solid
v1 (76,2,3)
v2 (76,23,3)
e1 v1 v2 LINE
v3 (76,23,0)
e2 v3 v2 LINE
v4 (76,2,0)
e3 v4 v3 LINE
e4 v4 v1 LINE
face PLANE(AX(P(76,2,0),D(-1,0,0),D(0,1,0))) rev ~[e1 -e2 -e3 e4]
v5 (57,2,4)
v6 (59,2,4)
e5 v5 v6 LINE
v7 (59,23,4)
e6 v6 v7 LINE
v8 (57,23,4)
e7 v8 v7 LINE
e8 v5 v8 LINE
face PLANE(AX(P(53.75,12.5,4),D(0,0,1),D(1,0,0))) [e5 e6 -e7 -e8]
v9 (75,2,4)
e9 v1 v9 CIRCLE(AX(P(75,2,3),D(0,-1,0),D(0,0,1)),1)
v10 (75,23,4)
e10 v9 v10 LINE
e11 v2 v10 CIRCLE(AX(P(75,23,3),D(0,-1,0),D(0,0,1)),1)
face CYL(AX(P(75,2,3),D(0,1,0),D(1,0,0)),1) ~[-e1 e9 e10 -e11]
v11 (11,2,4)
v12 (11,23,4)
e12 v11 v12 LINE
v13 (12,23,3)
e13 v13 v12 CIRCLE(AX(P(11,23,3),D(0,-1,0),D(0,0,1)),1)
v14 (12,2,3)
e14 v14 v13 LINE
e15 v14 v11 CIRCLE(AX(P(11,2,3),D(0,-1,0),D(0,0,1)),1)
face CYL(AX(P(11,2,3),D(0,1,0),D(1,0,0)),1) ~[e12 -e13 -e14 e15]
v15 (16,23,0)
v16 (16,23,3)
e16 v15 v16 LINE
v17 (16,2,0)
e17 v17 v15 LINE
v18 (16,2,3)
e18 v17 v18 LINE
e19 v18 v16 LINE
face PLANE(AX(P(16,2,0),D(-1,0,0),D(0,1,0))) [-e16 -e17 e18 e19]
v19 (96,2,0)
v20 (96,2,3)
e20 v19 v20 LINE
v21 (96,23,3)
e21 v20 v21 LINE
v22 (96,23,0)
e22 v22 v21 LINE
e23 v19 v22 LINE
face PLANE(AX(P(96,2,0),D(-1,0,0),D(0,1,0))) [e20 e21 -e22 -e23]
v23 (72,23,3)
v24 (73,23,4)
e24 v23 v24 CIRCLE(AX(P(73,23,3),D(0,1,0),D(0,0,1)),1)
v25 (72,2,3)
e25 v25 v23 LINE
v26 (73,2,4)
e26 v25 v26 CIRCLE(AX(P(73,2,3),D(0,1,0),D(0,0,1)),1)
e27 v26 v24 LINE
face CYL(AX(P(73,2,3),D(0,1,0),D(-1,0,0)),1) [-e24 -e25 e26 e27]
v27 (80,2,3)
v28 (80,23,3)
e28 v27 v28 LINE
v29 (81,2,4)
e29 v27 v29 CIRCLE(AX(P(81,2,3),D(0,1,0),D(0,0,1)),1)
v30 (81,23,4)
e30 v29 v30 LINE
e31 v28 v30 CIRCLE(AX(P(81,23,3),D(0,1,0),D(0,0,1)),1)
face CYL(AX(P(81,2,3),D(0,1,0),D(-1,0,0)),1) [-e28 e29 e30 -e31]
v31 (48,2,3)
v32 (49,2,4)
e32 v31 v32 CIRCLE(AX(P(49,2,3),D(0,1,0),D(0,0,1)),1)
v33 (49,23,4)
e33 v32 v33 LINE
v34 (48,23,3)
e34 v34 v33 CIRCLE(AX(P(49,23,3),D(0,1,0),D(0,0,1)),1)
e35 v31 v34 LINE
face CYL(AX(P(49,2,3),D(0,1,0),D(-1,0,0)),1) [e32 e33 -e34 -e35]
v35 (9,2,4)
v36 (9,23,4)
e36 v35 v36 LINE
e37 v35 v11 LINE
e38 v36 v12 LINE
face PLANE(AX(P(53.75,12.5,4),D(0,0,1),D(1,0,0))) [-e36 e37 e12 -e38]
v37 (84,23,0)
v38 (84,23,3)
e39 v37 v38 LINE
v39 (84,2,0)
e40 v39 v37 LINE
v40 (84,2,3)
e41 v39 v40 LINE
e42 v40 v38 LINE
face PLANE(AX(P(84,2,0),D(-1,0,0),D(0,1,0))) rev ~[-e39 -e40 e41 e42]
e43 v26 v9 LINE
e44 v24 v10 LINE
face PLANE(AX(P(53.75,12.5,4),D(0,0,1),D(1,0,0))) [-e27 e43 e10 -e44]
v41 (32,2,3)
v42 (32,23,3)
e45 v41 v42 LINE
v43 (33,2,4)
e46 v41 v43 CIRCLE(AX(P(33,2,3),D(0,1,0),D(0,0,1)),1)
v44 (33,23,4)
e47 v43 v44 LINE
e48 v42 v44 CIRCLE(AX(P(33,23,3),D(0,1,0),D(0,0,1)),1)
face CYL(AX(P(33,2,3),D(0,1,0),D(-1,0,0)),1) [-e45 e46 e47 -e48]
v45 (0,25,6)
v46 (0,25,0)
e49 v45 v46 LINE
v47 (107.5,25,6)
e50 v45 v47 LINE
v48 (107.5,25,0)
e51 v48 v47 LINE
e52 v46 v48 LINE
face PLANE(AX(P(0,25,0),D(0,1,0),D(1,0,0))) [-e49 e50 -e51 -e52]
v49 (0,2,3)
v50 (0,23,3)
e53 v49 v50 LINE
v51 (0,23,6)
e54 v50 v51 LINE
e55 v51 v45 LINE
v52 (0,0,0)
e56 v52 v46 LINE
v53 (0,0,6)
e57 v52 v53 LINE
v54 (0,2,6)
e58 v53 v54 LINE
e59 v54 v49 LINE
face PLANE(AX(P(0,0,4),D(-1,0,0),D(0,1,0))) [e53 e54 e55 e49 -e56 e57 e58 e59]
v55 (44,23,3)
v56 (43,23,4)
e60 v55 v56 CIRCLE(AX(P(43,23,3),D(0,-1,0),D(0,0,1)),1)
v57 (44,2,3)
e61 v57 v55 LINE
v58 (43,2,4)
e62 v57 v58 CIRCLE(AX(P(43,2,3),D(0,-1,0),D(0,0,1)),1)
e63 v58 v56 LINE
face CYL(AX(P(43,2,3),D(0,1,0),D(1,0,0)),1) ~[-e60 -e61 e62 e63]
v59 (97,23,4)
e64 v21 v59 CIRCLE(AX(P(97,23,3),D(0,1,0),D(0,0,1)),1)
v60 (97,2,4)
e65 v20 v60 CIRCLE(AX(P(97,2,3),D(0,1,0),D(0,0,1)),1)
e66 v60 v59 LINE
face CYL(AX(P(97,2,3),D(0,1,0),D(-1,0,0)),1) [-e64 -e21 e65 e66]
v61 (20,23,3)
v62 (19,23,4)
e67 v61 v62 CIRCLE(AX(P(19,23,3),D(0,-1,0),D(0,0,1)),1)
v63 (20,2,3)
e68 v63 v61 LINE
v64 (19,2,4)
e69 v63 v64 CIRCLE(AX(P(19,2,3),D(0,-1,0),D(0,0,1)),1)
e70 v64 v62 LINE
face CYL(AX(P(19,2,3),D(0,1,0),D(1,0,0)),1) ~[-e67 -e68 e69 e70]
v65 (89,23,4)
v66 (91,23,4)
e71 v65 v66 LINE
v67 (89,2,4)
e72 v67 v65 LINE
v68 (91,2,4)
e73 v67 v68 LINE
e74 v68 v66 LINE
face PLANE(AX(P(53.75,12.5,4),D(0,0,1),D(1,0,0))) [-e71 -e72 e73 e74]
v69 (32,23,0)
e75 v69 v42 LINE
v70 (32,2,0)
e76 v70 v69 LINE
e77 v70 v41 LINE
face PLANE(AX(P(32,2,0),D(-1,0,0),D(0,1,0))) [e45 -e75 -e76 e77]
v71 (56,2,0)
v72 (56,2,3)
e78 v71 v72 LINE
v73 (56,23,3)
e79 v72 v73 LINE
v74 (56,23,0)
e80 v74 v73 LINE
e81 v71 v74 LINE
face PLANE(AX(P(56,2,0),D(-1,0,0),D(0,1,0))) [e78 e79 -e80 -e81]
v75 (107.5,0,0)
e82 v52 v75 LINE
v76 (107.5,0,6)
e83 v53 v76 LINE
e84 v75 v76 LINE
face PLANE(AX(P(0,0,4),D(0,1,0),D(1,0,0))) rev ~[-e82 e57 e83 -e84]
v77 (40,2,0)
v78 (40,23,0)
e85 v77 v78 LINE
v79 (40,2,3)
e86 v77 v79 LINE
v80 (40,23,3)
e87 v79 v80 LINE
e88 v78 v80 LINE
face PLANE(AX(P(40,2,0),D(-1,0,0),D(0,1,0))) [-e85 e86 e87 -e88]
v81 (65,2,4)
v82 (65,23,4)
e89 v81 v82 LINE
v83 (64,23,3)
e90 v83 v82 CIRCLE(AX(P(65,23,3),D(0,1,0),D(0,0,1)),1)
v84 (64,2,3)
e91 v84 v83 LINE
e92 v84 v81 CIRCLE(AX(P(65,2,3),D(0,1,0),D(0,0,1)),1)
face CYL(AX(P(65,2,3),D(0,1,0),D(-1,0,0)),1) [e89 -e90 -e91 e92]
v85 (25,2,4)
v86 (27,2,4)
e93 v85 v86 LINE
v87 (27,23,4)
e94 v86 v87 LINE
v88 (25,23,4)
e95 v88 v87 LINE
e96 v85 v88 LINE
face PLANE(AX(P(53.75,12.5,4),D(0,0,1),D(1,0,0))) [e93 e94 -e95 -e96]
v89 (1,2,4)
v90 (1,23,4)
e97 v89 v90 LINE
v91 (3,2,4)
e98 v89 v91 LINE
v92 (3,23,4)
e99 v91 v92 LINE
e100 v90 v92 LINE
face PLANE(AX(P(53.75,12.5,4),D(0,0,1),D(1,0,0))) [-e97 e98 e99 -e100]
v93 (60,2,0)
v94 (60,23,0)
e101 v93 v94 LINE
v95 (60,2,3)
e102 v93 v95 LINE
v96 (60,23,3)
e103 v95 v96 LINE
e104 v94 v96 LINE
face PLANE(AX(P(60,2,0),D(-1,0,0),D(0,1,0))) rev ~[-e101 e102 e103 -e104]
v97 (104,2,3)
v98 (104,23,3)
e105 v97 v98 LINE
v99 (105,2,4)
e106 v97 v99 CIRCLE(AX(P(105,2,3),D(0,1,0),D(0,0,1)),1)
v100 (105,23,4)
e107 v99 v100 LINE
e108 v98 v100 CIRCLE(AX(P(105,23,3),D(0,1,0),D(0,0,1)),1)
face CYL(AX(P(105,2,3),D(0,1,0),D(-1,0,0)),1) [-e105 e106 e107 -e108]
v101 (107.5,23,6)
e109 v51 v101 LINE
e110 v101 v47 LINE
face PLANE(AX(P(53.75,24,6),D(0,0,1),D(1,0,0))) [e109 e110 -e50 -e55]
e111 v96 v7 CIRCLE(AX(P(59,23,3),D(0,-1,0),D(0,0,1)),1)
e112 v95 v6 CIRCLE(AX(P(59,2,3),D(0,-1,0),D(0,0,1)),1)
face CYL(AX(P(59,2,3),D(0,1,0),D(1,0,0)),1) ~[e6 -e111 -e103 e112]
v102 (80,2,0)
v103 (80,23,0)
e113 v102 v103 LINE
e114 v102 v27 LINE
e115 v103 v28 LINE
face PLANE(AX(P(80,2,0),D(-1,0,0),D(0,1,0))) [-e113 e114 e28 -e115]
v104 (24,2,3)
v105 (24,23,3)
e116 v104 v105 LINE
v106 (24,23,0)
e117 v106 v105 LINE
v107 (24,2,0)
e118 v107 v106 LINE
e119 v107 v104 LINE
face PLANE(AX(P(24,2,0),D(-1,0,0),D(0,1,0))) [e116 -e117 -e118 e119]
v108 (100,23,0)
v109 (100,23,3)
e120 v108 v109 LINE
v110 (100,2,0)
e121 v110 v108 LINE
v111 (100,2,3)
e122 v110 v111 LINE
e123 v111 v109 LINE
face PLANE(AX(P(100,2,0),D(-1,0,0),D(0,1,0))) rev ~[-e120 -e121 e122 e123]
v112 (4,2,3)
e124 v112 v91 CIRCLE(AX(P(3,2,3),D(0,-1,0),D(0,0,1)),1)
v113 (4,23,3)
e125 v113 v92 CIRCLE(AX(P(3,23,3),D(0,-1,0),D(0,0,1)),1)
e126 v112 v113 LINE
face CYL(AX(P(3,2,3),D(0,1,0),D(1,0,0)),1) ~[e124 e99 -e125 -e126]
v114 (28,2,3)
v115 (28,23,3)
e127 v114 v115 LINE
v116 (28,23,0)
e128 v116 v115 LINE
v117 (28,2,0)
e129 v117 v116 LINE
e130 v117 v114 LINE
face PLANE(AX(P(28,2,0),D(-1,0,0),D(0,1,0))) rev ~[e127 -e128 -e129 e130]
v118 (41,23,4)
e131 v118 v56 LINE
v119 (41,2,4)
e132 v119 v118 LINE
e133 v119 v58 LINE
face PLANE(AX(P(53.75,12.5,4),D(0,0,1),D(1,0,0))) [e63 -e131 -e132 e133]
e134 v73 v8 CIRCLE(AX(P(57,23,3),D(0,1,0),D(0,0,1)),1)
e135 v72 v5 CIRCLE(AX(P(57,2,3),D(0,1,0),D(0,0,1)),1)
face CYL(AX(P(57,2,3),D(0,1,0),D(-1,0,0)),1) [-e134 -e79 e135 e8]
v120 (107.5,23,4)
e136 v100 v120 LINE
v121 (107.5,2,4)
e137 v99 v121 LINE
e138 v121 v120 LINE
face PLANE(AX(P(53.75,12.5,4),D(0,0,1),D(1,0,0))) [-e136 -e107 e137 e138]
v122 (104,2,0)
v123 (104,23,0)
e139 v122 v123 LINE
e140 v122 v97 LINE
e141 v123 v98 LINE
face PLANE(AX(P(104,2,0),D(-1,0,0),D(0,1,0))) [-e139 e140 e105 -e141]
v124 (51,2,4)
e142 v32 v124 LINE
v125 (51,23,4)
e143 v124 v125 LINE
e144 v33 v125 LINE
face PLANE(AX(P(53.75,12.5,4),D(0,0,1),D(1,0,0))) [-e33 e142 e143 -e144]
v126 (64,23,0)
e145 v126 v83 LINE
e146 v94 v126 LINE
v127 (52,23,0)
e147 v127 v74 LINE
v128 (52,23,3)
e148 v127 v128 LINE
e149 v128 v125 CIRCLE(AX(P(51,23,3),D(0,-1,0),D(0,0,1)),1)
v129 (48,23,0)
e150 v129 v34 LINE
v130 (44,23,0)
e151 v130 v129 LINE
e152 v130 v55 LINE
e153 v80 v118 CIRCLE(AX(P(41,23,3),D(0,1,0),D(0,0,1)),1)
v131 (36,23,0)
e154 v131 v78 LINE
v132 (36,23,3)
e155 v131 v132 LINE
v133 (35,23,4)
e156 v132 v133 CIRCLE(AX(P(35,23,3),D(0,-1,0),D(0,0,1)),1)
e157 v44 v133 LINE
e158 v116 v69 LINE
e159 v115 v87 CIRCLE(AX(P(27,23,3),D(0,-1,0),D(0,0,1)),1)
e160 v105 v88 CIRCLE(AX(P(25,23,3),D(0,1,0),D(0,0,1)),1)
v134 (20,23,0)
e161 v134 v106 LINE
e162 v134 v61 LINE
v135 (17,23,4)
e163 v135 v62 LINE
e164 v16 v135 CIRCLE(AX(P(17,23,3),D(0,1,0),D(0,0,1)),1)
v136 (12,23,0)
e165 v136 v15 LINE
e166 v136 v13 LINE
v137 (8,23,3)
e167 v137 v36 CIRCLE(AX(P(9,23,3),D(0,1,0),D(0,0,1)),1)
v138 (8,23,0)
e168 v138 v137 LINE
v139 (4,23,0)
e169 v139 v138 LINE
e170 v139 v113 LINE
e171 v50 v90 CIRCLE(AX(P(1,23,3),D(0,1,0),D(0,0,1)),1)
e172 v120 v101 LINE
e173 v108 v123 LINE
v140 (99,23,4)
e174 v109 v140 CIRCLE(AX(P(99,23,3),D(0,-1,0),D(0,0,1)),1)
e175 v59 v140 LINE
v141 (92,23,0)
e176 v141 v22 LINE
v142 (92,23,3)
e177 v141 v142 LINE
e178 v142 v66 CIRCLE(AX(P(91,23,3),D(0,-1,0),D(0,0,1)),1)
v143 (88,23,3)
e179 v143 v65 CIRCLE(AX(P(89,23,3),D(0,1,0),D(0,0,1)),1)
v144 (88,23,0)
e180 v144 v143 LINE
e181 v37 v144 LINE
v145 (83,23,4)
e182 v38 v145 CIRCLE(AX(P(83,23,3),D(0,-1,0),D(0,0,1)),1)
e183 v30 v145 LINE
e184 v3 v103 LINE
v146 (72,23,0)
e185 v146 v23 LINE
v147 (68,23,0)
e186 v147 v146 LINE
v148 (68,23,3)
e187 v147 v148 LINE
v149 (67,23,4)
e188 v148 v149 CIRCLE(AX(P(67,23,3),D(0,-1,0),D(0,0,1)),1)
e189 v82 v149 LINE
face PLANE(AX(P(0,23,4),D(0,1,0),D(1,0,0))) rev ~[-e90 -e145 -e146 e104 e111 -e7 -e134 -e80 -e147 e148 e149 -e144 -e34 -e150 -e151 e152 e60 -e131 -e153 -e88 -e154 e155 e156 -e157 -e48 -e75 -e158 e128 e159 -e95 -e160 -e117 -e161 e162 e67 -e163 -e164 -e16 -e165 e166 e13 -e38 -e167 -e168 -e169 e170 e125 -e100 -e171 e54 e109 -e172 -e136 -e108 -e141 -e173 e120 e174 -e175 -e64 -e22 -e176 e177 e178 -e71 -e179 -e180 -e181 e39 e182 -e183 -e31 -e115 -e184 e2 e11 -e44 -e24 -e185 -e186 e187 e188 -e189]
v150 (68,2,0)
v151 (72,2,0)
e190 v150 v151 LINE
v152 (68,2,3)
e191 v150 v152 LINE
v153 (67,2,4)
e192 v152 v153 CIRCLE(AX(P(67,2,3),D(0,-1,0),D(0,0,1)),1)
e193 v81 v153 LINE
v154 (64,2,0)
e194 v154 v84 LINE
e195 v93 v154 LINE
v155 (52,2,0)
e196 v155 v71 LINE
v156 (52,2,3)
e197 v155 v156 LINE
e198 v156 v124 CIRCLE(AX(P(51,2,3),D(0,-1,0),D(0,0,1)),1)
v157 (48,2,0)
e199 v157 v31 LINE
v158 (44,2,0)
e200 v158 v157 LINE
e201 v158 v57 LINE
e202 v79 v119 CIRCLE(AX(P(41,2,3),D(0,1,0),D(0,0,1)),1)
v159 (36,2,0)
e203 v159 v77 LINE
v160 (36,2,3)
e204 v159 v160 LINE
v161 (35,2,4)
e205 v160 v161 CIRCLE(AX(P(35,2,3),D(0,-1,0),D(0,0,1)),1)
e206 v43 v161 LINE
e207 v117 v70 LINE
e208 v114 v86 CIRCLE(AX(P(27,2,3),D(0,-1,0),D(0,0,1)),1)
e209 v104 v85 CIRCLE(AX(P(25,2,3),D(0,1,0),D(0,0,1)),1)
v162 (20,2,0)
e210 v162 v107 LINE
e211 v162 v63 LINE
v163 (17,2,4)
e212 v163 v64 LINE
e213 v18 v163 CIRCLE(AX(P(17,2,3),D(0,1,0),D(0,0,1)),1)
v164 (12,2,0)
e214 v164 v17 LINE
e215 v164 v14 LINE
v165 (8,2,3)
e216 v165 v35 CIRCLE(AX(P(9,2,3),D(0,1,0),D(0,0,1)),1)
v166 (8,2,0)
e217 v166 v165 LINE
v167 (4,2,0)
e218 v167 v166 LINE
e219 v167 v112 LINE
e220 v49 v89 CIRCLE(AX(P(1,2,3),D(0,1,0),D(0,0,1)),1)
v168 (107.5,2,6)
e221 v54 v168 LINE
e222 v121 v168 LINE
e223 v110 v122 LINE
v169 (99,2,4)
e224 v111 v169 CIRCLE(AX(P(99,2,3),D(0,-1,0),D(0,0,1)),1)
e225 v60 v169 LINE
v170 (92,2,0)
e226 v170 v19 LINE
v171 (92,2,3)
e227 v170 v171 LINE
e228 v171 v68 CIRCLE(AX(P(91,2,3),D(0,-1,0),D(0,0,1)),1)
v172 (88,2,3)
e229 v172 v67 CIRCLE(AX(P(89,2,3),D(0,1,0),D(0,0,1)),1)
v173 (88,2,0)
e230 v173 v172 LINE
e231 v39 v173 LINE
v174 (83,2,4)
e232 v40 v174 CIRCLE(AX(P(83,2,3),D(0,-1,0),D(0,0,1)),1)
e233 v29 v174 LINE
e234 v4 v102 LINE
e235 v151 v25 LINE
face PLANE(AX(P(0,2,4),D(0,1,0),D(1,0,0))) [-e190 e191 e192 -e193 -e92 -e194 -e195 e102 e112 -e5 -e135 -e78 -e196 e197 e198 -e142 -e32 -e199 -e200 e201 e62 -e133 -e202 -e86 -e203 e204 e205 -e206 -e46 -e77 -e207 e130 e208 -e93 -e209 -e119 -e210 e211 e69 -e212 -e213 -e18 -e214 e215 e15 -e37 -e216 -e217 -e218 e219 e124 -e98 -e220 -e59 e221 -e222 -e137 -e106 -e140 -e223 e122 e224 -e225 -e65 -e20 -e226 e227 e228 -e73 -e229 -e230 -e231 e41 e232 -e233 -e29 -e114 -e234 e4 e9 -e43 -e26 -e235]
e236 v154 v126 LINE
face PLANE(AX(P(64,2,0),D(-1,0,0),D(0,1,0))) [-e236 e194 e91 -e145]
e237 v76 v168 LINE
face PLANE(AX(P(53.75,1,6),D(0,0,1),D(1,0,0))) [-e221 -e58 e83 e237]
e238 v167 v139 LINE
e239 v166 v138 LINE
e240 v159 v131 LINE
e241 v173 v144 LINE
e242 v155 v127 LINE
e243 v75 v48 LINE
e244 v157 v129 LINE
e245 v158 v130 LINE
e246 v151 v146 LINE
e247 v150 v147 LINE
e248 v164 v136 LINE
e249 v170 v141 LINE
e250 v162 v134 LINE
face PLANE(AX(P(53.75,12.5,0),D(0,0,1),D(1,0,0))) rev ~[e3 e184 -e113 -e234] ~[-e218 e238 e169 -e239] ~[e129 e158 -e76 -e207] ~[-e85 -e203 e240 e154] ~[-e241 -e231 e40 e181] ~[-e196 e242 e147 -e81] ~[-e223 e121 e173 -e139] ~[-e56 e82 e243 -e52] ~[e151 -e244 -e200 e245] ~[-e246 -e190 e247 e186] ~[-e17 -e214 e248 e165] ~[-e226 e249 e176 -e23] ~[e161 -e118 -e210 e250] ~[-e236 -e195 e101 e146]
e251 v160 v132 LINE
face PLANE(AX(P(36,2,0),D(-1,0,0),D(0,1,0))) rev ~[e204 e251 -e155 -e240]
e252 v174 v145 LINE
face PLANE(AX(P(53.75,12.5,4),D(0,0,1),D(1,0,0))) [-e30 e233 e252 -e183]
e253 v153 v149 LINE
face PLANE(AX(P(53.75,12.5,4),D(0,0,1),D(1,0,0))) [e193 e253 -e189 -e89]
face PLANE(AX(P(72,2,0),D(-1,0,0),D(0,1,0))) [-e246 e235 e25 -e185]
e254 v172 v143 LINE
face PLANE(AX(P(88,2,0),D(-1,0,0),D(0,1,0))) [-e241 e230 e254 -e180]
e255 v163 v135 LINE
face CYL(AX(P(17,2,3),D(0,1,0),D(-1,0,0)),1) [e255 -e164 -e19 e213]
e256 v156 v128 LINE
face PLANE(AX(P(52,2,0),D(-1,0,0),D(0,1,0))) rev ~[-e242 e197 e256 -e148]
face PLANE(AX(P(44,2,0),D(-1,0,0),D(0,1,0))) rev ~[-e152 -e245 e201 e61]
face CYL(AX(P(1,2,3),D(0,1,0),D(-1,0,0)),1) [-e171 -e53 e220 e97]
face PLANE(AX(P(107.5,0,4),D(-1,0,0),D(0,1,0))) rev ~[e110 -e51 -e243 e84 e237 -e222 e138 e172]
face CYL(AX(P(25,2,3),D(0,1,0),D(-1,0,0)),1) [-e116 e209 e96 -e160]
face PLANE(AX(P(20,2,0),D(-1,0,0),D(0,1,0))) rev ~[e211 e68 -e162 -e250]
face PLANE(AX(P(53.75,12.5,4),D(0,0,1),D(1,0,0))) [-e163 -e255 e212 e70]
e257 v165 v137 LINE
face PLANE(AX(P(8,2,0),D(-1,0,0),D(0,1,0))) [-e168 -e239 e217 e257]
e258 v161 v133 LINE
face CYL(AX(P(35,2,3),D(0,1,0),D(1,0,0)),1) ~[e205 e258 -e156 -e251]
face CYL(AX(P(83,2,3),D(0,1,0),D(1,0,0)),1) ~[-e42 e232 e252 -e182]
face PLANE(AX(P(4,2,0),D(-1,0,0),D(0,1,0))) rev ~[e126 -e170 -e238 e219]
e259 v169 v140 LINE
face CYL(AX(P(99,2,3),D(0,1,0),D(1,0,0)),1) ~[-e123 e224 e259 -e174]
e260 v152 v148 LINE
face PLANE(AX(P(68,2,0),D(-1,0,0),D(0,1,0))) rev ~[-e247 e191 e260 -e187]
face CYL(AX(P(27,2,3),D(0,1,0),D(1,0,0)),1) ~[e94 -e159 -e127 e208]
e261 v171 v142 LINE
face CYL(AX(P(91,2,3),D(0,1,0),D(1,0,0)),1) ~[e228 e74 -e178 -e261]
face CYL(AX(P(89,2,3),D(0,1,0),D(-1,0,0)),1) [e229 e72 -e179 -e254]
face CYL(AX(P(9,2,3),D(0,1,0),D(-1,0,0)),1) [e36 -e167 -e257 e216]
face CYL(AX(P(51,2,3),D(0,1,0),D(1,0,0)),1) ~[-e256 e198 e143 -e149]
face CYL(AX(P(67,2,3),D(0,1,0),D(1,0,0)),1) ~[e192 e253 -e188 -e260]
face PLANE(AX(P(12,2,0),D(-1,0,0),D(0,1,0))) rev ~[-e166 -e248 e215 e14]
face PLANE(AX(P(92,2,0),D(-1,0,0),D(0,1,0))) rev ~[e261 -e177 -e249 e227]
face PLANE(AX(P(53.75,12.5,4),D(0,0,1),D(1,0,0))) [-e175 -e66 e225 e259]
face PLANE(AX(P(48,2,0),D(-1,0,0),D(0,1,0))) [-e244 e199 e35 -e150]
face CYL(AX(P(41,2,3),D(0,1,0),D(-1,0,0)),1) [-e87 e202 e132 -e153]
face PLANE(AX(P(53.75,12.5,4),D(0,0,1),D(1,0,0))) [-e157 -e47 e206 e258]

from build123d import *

# Parameters (mm, degrees)
F0_W     = 107.5
F0_H     = 25
F0_W_2   = 4
F0_H_2   = 21
F1_DEPTH = 4
F2_R     = 1
F3_W     = 107.5
F3_H     = 2
F4_DEPTH = 2
F5_R     = 1


# Not quite as in the source:
# - a feature names something its author has since deleted; it is built from what else it names


with BuildPart() as f1:
    # F0 (on Top) → F1 (new body)
    with BuildSketch(Plane.XY):
        with Locations((53.75, 12.5)):
            Rectangle(F0_W, F0_H)
        with Locations((6, 12.5)):
            Rectangle(F0_W_2, F0_H_2, mode=Mode.SUBTRACT)
        with Locations((14, 12.5)):
            Rectangle(F0_W_2, F0_H_2, mode=Mode.SUBTRACT)
        with Locations((22, 12.5)):
            Rectangle(F0_W_2, F0_H_2, mode=Mode.SUBTRACT)
        with Locations((30, 12.5)):
            Rectangle(F0_W_2, F0_H_2, mode=Mode.SUBTRACT)
        with Locations((38, 12.5)):
            Rectangle(F0_W_2, F0_H_2, mode=Mode.SUBTRACT)
        with Locations((46, 12.5)):
            Rectangle(F0_W_2, F0_H_2, mode=Mode.SUBTRACT)
        with Locations((54, 12.5)):
            Rectangle(F0_W_2, F0_H_2, mode=Mode.SUBTRACT)
        with Locations((62, 12.5)):
            Rectangle(F0_W_2, F0_H_2, mode=Mode.SUBTRACT)
        with Locations((70, 12.5)):
            Rectangle(F0_W_2, F0_H_2, mode=Mode.SUBTRACT)
        with Locations((78, 12.5)):
            Rectangle(F0_W_2, F0_H_2, mode=Mode.SUBTRACT)
        with Locations((86, 12.5)):
            Rectangle(F0_W_2, F0_H_2, mode=Mode.SUBTRACT)
        with Locations((94, 12.5)):
            Rectangle(F0_W_2, F0_H_2, mode=Mode.SUBTRACT)
        with Locations((102, 12.5)):
            Rectangle(F0_W_2, F0_H_2, mode=Mode.SUBTRACT)
    extrude(amount=F1_DEPTH)

    # F2
    f2_edges = [f1.edges().sort_by_distance(p)[0] for p in [
        (8, 12.5, 4),
        (12, 12.5, 4),
        (16, 12.5, 4),
        (20, 12.5, 4),
        (24, 12.5, 4),
        (28, 12.5, 4),
        (32, 12.5, 4),
        (36, 12.5, 4),
        (40, 12.5, 4),
        (44, 12.5, 4),
        (48, 12.5, 4),
        (52, 12.5, 4),
        (56, 12.5, 4),
        (60, 12.5, 4),
        (64, 12.5, 4),
        (68, 12.5, 4),
        (72, 12.5, 4),
        (76, 12.5, 4),
        (80, 12.5, 4),
        (84, 12.5, 4),
        (88, 12.5, 4),
        (92, 12.5, 4),
        (96, 12.5, 4),
        (100, 12.5, 4),
        (104, 12.5, 4),
    ]]
    fillet(f2_edges, radius=F2_R)

    # F3 (on face) → F4 (join)
    with BuildSketch(Plane.XY.offset(4)):
        with Locations((53.75, 1)):
            Rectangle(F3_W, F3_H)
        with Locations((53.75, 24)):
            Rectangle(F3_W, F3_H)
    extrude(amount=F4_DEPTH)

    # F5
    f5_edges = [f1.edges().sort_by_distance(p)[0] for p in [
        (4, 12.5, 4),
        (0, 12.5, 4),
    ]]
    fillet(f5_edges, radius=F5_R)


solid = f1.part
